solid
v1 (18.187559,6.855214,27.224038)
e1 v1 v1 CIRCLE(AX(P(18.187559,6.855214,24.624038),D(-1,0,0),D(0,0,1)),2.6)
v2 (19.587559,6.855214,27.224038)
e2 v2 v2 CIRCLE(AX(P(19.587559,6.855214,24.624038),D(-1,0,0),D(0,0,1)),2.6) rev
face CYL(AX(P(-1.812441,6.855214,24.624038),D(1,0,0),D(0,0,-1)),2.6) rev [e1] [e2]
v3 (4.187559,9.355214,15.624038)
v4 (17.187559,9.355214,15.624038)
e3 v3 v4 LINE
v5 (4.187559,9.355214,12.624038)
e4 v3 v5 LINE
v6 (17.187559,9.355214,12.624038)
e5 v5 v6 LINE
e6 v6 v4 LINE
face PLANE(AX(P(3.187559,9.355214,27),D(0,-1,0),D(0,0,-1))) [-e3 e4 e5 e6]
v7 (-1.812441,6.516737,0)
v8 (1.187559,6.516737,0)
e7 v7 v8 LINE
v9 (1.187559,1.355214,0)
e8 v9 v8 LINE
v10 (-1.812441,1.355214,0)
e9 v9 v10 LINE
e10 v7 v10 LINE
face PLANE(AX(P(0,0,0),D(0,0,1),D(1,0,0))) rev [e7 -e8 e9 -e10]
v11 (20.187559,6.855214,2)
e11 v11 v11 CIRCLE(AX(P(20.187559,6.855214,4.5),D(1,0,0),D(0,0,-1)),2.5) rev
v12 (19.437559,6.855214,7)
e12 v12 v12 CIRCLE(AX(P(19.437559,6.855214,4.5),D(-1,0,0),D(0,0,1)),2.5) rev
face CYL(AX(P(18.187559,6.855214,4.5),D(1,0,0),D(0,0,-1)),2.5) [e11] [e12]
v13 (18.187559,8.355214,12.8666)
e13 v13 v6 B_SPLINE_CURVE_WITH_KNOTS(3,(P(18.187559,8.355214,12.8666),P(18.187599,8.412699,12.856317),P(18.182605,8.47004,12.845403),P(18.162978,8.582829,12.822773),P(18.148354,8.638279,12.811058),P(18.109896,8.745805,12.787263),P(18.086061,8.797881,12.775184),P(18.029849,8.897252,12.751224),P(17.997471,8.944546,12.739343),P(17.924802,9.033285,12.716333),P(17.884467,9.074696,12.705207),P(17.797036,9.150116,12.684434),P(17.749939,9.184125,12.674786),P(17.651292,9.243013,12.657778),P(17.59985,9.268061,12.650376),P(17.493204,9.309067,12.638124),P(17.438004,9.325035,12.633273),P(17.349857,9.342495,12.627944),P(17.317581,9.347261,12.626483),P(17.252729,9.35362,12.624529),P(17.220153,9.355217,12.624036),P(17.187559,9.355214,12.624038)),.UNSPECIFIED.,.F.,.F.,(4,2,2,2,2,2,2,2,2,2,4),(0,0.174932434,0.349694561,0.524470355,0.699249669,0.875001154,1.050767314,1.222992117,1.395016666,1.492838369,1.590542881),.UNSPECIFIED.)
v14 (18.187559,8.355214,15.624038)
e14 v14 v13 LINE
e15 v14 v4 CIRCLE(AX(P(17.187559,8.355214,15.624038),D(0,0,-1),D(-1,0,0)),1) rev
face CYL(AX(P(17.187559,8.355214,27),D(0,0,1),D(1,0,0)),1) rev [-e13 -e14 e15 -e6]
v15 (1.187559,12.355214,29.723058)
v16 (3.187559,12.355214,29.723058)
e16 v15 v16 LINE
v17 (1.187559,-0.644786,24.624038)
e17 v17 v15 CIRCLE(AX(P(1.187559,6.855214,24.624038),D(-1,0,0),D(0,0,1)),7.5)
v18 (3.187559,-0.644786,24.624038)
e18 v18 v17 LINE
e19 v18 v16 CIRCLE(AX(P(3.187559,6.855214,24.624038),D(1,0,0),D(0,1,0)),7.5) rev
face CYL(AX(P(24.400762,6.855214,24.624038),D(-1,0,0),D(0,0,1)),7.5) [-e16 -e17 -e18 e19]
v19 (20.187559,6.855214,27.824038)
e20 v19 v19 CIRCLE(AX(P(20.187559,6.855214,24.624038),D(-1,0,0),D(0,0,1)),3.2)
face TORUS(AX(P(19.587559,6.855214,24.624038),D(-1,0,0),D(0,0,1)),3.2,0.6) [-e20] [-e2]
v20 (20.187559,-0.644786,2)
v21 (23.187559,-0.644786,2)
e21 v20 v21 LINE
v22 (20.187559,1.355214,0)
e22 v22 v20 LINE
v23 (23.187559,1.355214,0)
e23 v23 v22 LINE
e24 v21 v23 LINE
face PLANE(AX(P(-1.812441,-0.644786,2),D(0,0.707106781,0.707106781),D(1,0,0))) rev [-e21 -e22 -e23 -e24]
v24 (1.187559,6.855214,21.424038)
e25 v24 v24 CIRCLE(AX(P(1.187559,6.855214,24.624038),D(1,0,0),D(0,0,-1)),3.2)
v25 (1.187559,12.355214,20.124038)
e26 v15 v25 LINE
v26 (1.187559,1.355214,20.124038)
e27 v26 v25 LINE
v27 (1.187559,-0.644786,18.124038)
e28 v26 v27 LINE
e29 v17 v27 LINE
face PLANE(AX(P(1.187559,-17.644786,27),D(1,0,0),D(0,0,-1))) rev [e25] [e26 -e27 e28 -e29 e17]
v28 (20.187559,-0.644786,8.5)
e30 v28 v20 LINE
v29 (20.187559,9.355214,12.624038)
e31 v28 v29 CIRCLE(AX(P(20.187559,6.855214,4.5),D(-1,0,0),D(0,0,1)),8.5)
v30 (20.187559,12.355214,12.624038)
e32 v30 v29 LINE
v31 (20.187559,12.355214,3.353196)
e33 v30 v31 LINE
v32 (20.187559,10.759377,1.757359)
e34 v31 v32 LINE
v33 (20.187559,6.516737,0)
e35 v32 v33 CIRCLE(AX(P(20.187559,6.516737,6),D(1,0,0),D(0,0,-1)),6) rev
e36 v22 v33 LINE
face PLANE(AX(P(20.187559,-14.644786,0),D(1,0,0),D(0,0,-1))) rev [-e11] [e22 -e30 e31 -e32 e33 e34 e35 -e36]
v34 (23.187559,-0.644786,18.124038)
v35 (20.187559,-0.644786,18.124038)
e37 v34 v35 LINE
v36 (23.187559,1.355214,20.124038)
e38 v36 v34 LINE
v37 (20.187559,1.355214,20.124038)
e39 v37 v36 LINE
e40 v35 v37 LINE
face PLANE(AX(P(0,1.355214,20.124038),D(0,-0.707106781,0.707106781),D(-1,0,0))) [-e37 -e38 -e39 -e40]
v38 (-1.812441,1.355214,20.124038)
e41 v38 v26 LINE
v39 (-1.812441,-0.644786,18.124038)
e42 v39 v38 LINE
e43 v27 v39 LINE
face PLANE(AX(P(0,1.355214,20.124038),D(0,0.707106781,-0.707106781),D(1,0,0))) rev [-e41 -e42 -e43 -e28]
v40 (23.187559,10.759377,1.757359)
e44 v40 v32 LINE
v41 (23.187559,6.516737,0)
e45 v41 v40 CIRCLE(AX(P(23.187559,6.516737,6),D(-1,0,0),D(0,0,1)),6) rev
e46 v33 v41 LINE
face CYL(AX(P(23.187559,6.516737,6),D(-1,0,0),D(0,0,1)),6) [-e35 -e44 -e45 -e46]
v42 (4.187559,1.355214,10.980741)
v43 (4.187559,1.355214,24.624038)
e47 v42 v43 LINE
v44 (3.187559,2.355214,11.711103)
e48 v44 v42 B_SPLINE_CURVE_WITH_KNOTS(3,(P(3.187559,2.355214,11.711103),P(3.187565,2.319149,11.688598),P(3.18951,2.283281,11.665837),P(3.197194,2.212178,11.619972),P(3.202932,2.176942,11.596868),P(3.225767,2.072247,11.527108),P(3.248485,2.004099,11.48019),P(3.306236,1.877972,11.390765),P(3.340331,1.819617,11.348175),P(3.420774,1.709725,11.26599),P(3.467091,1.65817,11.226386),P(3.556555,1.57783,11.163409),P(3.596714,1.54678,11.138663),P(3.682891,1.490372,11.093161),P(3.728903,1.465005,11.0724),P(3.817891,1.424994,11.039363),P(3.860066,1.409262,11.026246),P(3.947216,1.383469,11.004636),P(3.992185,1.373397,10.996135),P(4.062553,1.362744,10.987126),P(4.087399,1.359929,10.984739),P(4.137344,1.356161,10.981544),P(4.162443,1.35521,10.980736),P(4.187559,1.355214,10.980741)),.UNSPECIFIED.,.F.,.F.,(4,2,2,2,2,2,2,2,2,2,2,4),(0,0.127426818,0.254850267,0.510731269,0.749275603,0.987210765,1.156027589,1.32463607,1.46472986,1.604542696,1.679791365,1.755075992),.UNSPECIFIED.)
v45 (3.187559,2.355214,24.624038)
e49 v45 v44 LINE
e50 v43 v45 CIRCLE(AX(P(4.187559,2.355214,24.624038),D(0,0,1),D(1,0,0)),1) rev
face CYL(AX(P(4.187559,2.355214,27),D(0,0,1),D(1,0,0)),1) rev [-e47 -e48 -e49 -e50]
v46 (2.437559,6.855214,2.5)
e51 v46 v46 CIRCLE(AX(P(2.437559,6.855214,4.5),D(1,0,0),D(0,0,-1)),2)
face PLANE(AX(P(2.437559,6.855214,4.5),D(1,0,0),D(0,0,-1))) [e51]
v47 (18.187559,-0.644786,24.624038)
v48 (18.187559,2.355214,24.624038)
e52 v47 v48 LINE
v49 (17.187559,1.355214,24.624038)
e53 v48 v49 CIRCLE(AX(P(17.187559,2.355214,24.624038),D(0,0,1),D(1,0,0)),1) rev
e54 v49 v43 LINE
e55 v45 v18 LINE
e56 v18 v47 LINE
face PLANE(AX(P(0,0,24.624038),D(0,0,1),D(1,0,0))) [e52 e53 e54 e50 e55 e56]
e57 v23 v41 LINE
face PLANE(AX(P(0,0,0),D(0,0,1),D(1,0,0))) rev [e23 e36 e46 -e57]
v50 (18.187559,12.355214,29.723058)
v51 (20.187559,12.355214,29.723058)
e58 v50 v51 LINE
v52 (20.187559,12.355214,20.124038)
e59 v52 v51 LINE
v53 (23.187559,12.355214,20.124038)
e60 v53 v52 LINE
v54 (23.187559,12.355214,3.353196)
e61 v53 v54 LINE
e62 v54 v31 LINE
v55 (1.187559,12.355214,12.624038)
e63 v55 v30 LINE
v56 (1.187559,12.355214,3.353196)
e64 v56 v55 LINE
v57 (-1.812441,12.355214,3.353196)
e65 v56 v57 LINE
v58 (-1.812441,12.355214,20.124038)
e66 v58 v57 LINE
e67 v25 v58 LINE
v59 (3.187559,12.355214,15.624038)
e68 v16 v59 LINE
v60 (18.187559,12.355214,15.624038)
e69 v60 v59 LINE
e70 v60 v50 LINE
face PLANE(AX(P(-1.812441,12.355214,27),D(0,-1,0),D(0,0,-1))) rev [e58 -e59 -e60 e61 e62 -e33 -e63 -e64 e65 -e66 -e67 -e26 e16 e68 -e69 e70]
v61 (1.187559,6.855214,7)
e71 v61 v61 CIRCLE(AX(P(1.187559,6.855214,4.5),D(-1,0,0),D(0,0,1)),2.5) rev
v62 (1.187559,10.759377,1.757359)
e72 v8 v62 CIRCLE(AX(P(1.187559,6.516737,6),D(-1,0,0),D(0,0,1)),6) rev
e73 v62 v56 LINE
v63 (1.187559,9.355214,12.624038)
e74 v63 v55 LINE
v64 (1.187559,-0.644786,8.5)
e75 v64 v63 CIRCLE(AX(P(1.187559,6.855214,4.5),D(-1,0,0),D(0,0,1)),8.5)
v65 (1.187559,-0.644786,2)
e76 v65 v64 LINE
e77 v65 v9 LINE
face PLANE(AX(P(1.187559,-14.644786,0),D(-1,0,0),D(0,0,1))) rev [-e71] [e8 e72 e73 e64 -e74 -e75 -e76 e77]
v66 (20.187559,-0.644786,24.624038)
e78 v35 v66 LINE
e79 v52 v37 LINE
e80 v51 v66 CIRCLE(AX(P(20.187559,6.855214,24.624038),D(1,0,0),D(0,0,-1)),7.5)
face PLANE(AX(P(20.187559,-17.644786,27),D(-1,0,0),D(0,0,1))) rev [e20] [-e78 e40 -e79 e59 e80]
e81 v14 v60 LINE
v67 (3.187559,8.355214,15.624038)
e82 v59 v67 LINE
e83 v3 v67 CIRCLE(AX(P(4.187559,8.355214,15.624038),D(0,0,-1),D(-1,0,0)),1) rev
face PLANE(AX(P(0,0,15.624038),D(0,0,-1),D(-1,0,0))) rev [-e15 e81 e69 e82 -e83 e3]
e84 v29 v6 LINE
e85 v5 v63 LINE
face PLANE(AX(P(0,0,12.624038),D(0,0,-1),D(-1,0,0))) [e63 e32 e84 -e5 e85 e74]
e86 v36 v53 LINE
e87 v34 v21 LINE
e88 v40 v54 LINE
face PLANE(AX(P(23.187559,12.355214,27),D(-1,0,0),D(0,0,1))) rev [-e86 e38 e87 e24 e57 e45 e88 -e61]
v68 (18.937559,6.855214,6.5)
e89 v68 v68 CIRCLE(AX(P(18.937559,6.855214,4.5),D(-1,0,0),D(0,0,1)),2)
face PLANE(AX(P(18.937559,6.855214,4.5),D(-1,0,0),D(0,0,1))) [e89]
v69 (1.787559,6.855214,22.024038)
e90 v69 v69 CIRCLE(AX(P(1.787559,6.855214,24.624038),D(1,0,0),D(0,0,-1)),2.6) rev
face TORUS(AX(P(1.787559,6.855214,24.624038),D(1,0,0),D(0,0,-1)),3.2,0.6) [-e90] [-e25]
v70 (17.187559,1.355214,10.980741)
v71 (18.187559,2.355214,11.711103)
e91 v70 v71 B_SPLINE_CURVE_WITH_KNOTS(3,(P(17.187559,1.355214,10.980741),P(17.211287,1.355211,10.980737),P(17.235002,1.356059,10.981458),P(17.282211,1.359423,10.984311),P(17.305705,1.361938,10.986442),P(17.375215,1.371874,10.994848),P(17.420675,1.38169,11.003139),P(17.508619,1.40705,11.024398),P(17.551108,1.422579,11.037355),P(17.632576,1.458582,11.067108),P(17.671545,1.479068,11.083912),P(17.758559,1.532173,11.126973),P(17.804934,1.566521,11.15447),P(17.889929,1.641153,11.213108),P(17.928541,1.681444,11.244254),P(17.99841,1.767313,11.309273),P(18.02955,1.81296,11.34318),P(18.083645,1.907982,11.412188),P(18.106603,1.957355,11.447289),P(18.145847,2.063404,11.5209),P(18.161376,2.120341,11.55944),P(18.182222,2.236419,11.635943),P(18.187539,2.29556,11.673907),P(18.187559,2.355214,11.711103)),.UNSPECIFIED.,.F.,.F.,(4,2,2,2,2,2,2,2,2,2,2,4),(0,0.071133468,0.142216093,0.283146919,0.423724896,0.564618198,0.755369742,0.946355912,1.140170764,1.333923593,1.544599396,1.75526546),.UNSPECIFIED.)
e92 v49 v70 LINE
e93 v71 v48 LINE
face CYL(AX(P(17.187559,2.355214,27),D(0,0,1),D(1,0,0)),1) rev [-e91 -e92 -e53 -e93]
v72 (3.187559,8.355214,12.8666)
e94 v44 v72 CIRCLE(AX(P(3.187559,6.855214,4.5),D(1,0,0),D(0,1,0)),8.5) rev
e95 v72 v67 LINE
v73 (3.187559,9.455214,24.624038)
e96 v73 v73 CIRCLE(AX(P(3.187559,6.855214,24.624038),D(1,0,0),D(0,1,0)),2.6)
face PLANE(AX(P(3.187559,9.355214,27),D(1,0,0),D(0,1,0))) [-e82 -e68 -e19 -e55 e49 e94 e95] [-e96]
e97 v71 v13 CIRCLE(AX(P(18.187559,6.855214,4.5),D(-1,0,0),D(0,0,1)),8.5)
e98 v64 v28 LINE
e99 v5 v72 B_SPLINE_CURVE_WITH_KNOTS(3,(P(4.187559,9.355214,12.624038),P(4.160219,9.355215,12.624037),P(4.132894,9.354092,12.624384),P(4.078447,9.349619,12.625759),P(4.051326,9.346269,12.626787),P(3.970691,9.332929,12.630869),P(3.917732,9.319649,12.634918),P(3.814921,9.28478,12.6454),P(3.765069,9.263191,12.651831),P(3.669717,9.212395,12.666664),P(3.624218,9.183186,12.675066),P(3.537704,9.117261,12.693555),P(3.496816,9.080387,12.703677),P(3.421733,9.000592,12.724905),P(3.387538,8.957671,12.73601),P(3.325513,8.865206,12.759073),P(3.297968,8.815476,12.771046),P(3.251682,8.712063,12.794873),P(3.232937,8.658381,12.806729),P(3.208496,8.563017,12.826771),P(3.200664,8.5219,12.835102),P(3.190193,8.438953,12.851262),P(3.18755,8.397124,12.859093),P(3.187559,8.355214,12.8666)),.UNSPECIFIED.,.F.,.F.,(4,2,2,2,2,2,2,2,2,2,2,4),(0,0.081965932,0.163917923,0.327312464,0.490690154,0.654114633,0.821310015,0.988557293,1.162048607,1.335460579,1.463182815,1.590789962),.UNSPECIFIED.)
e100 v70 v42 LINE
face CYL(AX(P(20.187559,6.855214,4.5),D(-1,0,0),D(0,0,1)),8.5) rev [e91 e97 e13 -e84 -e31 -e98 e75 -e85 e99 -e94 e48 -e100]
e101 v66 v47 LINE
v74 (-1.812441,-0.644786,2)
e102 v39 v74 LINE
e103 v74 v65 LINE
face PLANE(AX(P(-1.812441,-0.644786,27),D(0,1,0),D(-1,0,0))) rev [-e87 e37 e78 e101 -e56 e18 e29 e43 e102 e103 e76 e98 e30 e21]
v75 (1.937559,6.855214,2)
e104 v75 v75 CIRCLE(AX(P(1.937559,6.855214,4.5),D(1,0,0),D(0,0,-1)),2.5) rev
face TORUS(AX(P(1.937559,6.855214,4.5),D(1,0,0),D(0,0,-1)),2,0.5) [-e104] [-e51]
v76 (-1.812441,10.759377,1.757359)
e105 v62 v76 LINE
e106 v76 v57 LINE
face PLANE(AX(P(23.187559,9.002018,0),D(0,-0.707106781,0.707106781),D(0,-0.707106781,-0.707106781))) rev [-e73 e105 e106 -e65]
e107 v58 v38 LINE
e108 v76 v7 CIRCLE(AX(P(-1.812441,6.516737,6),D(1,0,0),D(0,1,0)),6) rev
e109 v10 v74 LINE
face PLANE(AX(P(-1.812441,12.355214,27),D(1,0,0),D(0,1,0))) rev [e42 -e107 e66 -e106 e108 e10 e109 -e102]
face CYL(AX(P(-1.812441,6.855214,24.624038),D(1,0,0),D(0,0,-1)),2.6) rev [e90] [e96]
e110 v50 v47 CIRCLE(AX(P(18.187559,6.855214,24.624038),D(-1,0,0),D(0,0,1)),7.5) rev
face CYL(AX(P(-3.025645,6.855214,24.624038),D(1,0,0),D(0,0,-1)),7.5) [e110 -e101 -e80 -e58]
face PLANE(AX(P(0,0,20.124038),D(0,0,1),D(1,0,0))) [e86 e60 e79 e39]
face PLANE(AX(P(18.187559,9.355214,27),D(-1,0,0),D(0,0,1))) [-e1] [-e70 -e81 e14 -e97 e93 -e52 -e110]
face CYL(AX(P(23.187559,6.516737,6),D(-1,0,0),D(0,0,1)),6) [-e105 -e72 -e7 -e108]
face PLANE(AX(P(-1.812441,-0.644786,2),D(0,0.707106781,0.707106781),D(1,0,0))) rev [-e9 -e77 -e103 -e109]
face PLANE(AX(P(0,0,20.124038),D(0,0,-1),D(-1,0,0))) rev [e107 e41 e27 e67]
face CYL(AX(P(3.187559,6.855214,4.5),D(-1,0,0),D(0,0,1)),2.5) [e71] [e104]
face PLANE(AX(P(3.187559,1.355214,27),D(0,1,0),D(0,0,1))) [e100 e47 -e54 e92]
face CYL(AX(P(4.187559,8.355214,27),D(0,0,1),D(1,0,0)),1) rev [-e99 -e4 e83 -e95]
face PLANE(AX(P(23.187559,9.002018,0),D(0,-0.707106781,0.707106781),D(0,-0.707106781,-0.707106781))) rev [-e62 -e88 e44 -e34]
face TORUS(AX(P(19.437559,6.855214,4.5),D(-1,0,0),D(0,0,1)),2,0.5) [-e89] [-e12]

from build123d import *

# Parameters (mm, degrees)
EXTRUDE_1_DEPTH           = 27
CUT_EXTRUDE_1_DEPTH       = 27
SKETCH_3_R                = 2.5000000000000013
EXTRUDE_2_DEPTH           = 2
CUT_EXTRUDE_START         = -2
SKETCH_4_R                = 8.5
SKETCH_4_R_2              = 2.5000000000000018
CUT_EXTRUDE_2_DEPTH       = 2
SKETCH_5_R                = 8.5
CUT_EXTRUDE_3_DEPTH       = 17
SKETCH_9_W                = 19
SKETCH_9_H                = 0.7371254741666728
CUT_EXTRUDE_7_DEPTH       = 4
CUT_EXTRUDE_8_DEPTH       = 0.906172
EXTRUDE_START             = 2
SKETCH_13_R               = 2.5000000000000004
EXTRUDE_4_DEPTH           = 2
SKETCH_14_W               = 3
SKETCH_14_H               = 7.375961595364039
SKETCH_14_W_2             = 2.9999999999999964
CUT_EXTRUDE_10_DEPTH      = 30
CUT_EXTRUDE_11_DEPTH      = 37.95471984311929
CUT_EXTRUDE_11_DEPTH_BACK = 37.95471984311929
FILLET_3_R                = 6
SKETCH_19_W               = 2.3759615953640427
SKETCH_19_H               = 13
CUT_EXTRUDE_13_DEPTH      = 37.95471984311929
SKETCH_18_R               = 7.499999999999999
EXTRUDE_5_DEPTH           = 2
EXTRUDE_START_2           = -2
SKETCH_20_R               = 7.499999999999999
EXTRUDE_6_DEPTH           = 2
SKETCH_21_W               = 27.916060476025446
SKETCH_21_H               = 6.853449812850004
CUT_EXTRUDE_14_DEPTH      = 44.16278511667507
CUT_EXTRUDE_15_DEPTH      = 41.84856377041868
CUT_EXTRUDE_15_DEPTH_BACK = 41.84856377041868
SKETCH_22_R               = 2.5999999999999996
FILLET_4_R                = 0.6
FILLET_5_R                = 0.6
FILLET_6_R                = 1
FILLET_7_R                = 0.5
SKETCH_23_R               = 2.5000000000000004
CUT_EXTRUDE_16_DEPTH      = 0.75
CUT_EXTRUDE_START_2       = -0.75
SKETCH_25_R               = 2.5000000000000013
CUT_EXTRUDE_17_DEPTH      = 0.75
FILLET_8_R                = 0.5
SKETCH_27_W               = 15
SKETCH_27_H               = 4.175939890720404
CUT_EXTRUDE_18_DEPTH      = 4
EXTRUDE_8_DEPTH           = 5
FILLET_9_R                = 1
SKETCH_29_W               = 2.9999999999999964
SKETCH_29_H               = 12.999999999999996
SKETCH_29_W_2             = 3
EXTRUDE_9_DEPTH           = 0.5
CHAMFER_1_SIZE            = 2


with BuildPart() as part:
    # 草圖1 → 填料-伸長1 (new body)
    with BuildSketch(Plane.XY):
        Polygon((-1.8124414345344562, 12.355214230576285), (23.187558565465547, 12.355214230576285), (23.187558565465547, -0.6447857694237141), (-1.8124414345344548, -0.6447857694237142), align=None)
        Polygon((3.1875585654655443, 9.355214230576284), (18.187558565465544, 9.355214230576284), (18.187558565465544, 1.355214230576286), (3.187558565465545, 1.355214230576286), align=None, mode=Mode.SUBTRACT)
    extrude(amount=EXTRUDE_1_DEPTH)

    # 草圖2 → 除料-伸長1 (cut)
    with BuildSketch(Plane(origin=(0, 12.355214230576285, 0), x_dir=(1, 0, 0), z_dir=(0, 1, 0))):
        Polygon((1.1875585654655443, 0), (20.187558565465547, 0), (20.187558565465547, -8), (1.1875585654655452, -8), align=None)
    extrude(amount=-CUT_EXTRUDE_1_DEPTH, mode=Mode.SUBTRACT)

    # 草圖3 → 填料-伸長2 (add)
    with BuildSketch(Plane.ZY.offset(-20.187558565465547)):
        with Locations(Location((4.5, 6.855214230576285, 0), (0, 0, 180))):
            Circle(SKETCH_3_R)
    extrude(amount=EXTRUDE_2_DEPTH)

    # 草圖4 → 除料-伸長2 (cut)
    with BuildSketch(Plane.ZY.offset(-18.187558565465547).offset(CUT_EXTRUDE_START)):
        with Locations((4.500000000000004, 6.855214230576285)):
            Circle(SKETCH_4_R)
        with Locations(Location((4.500000000000004, 6.855214230576285, 0), (0, 0, 180))):
            Circle(SKETCH_4_R_2, mode=Mode.SUBTRACT)
    extrude(amount=CUT_EXTRUDE_2_DEPTH, mode=Mode.SUBTRACT)

    # 草圖5 → 除料-伸長3 (cut)
    with BuildSketch(Plane.ZY.offset(-18.187558565465547)):
        with Locations((4.500000000000004, 6.855214230576285)):
            Circle(SKETCH_5_R)
    extrude(amount=CUT_EXTRUDE_3_DEPTH, mode=Mode.SUBTRACT)

    # 草圖9 → 除料-伸長7 (cut)
    with BuildSketch(Plane(origin=(0, 12.355214230576285, 0), x_dir=(1, 0, 0), z_dir=(0, 1, 0))):
        with Locations((10.687558565465551, -11.349303435491194)):
            Rectangle(SKETCH_9_W, SKETCH_9_H)
    extrude(amount=-CUT_EXTRUDE_7_DEPTH, mode=Mode.SUBTRACT)

    # 草圖10 → 除料-伸長8 (cut)
    with BuildSketch(Plane(origin=(0, 0, 11.717866172574531), x_dir=(-1, 0, 0), z_dir=(0, 0, -1))):
        Polygon((-20.18755856546555, 12.355214230576285), (-1.1875585654655494, 12.355214230576285), (-1.1875585654655487, 9.355214230576284), (-20.18755856546555, 9.355214230576284), align=None)
    extrude(amount=-CUT_EXTRUDE_8_DEPTH, mode=Mode.SUBTRACT)

    # 草圖13 → 填料-伸長4 (add)
    with BuildSketch(Plane(origin=(1.1875585654655443, 0, -1.3e-16), x_dir=(-1.1e-16, 0, -1), z_dir=(1, 0, -1.1e-16)).offset(EXTRUDE_START)):
        with Locations((-4.5, 6.855214230576285)):
            Circle(SKETCH_13_R)
    extrude(amount=-EXTRUDE_4_DEPTH)

    # 草圖14 → 除料-伸長10 (cut)
    with BuildSketch(Plane(origin=(0, 12.355214230576285, 0), x_dir=(1, 0, 0), z_dir=(0, 1, 0))):
        with Locations((-0.31244143453445605, -23.312019202317984)):
            Rectangle(SKETCH_14_W, SKETCH_14_H)
        with Locations((21.687558565465544, -23.312019202317984)):
            Rectangle(SKETCH_14_W_2, SKETCH_14_H)
        Polygon((3.1875585654655425, -27), (18.187558565465547, -27), (18.187558565465547, -19.624038404635964), (3.1875585654655443, -19.624038404635964), align=None)
    extrude(amount=-CUT_EXTRUDE_10_DEPTH, mode=Mode.SUBTRACT)

    # 草圖15 → 除料-伸長11 (cut, two sides: drawn at the far end of the back side and taken through both)
    with BuildSketch(Plane.ZY.offset(-20.187558565465547).offset(-CUT_EXTRUDE_11_DEPTH_BACK)):
        Polygon((0, 9.00201797372982), (3.3531962568464273, 12.355214230576285), (0, 12.355214230576285), align=None)
    extrude(amount=CUT_EXTRUDE_11_DEPTH + CUT_EXTRUDE_11_DEPTH_BACK, mode=Mode.SUBTRACT)

    # 圓角3
    fillet_3_edges = [part.edges().sort_by_distance(p)[0] for p in [
        (-0.31244143453445616, 9.00201797372982, 0),
        (21.687558565465547, 9.00201797372982, 0),
    ]]
    fillet(fillet_3_edges, radius=FILLET_3_R)

    # 草圖19 → 除料-伸長13 (cut, through all)
    with BuildSketch(Plane.ZY.offset(-1.187558565465544)):
        with Locations((25.812019202317984, 5.855214230576285)):
            Rectangle(SKETCH_19_W, SKETCH_19_H)
    extrude(amount=-CUT_EXTRUDE_13_DEPTH, mode=Mode.SUBTRACT)

    # 草圖18 → 填料-伸長5 (add)
    with BuildSketch(Plane(origin=(20.187558565465547, 0, 0), x_dir=(0, 0, -1), z_dir=(1, 0, 0))):
        with Locations((-24.624038404635964, 6.855214230576285)):
            Circle(SKETCH_18_R)
    extrude(amount=-EXTRUDE_5_DEPTH)

    # 草圖20 → 填料-伸長6 (add)
    with BuildSketch(Plane.ZY.offset(-1.187558565465544).offset(EXTRUDE_START_2)):
        with Locations((24.624038404635964, 6.855214230576285)):
            Circle(SKETCH_20_R)
    extrude(amount=EXTRUDE_6_DEPTH)

    # 草圖21 → 除料-伸長14 (cut, through all)
    with BuildSketch(Plane(origin=(23.187558565465547, 0, 0), x_dir=(0, 0, -1), z_dir=(1, 0, 0))):
        with Locations((-28.1917606773101, 15.781939137001288)):
            Rectangle(SKETCH_21_W, SKETCH_21_H)
    extrude(amount=-CUT_EXTRUDE_14_DEPTH, mode=Mode.SUBTRACT)

    # 草圖22 → 除料-伸長15 (cut, two sides: drawn at the far end of the back side and taken through both)
    with BuildSketch(Plane(origin=(20.187558565465547, 0, 0), x_dir=(0, 0, -1), z_dir=(1, 0, 0)).offset(-CUT_EXTRUDE_15_DEPTH_BACK)):
        with Locations((-24.624038404635964, 6.8552142305762835)):
            Circle(SKETCH_22_R)
    extrude(amount=CUT_EXTRUDE_15_DEPTH + CUT_EXTRUDE_15_DEPTH_BACK, mode=Mode.SUBTRACT)

    # 圓角4
    fillet_4_edges = [part.edges().sort_by_distance(p)[0] for p in [
        (20.187558565465547, 6.855214230576285, 27.224038404635962),
    ]]
    fillet(fillet_4_edges, radius=FILLET_4_R)

    # 圓角5
    fillet_5_edges = [part.edges().sort_by_distance(p)[0] for p in [
        (1.1875585654655438, 6.855214230576285, 27.224038404635962),
    ]]
    fillet(fillet_5_edges, radius=FILLET_5_R)

    # 圓角6
    # the kernel refuses this fillet: 1 mm, written as the material it adds along each edge
    with BuildSketch(Plane(origin=(18.187558565465544, 9.355214230576284, 19.624038404635964), x_dir=(3.55e-15, -1, 1.066e-14), z_dir=(5.1e-16, -1.066e-14, -1))) as fillet_6_piece_1_section:
        with BuildLine():
            CenterArc((FILLET_6_R, FILLET_6_R), FILLET_6_R, 180, 90.00000000000023)
            Line((-3.55e-15, FILLET_6_R), (0, 0))
            Line((0, 0), (FILLET_6_R, 0))
        make_face()
    fillet_6_piece_1 = extrude(amount=9.499999999999957, mode=Mode.PRIVATE)
    fillet_6_piece_1 = split(fillet_6_piece_1, bisect_by=Plane(origin=(17.960107802534193, 9.130564344096692, 12.624038172574531), z_dir=(0, 0, 1)), keep=Keep.TOP, mode=Mode.PRIVATE)
    fillet_6_piece_1 = fillet_6_piece_1 - Plane(origin=(17.96010780253419, 6.855214230576285, 4.5), x_dir=(2.4e-16, 0, 1), z_dir=(1, 0, -2.4e-16)) * Cylinder(8.5, 23, mode=Mode.PRIVATE)
    add(fillet_6_piece_1)
    with BuildSketch(Plane(origin=(3.187558565465544, 9.355214230576284, 10.124038404635964), x_dir=(0, -1, 0), z_dir=(0, 0, 1))) as fillet_6_piece_2_section:
        with BuildLine():
            CenterArc((FILLET_6_R, FILLET_6_R), FILLET_6_R, 180, 90)
            Line((0, FILLET_6_R), (0, 0))
            Line((0, 0), (FILLET_6_R, 0))
        make_face()
    fillet_6_piece_2 = extrude(amount=9.5, mode=Mode.PRIVATE)
    fillet_6_piece_2 = split(fillet_6_piece_2, bisect_by=Plane(origin=(3.4150094343401456, 9.130564406809754, 12.624038172574531), z_dir=(0, 0, 1)), keep=Keep.TOP, mode=Mode.PRIVATE)
    fillet_6_piece_2 = fillet_6_piece_2 - Plane(origin=(3.415009434340142, 6.855214230576285, 4.5000000000000036), x_dir=(2.4e-16, 0, 1), z_dir=(1, 0, -2.4e-16)) * Cylinder(8.5, 23, mode=Mode.PRIVATE)
    add(fillet_6_piece_2)

    # 圓角7
    fillet_7_edges = [part.edges().sort_by_distance(p)[0] for p in [
        (10.687558565465999, 9.355214230576284, 19.624038404635964),
        (3.4804517842794525, 9.062321011762547, 19.624038404636),
        (17.894665346652545, 9.062321011762547, 19.624038404636),
    ]]
    fillet(fillet_7_edges, radius=FILLET_7_R)

    # 草圖23 → 除料-伸長16 (cut)
    with BuildSketch(Plane(origin=(3.1875585654655443, 0, -3.5e-16), x_dir=(-1.1e-16, 0, -1), z_dir=(1, 0, -1.1e-16))):
        with Locations(Location((-4.5, 6.855214230576285, 0), (0, 0, 180))):
            Circle(SKETCH_23_R)
    extrude(amount=-CUT_EXTRUDE_16_DEPTH, mode=Mode.SUBTRACT)

    # 草圖25 → 除料-伸長17 (cut)
    with BuildSketch(Plane.ZY.offset(-18.187558565465547).offset(CUT_EXTRUDE_START_2)):
        with Locations(Location((4.500000000000004, 6.855214230576285, 0), (0, 0, 180))):
            Circle(SKETCH_25_R)
    extrude(amount=CUT_EXTRUDE_17_DEPTH, mode=Mode.SUBTRACT)

    # 圓角8
    fillet_8_edges = [part.edges().sort_by_distance(p)[0] for p in [
        (2.437558565465545, 6.855214230576286, 7),
        (18.937558565465547, 6.855214230576284, 7.000000000000001),
    ]]
    fillet(fillet_8_edges, radius=FILLET_8_R)

    # 草圖27 → 除料-伸長18 (cut)
    with BuildSketch(Plane.XY.offset(19.624038404635964)):
        with Locations((10.687558565465544, 10.267244285216083)):
            Rectangle(SKETCH_27_W, SKETCH_27_H)
    extrude(amount=-CUT_EXTRUDE_18_DEPTH, mode=Mode.SUBTRACT)

    # 草圖28 → 填料-伸長8 (add)
    with BuildSketch(Plane.XY.offset(19.624038404635964)):
        Polygon((18.187558565465547, -0.6447857694237141), (3.1875585654655443, -0.6447857694237141), (3.1875585654655434, 1.355214230576286), (18.187558565465547, 1.3552142305762875), align=None)
    extrude(amount=EXTRUDE_8_DEPTH)

    # 圓角9
    fillet_9_edges = [part.edges().sort_by_distance(p)[0] for p in [
        (18.187558565465544, 1.3552142305762809, 17.8023895515219),
        (3.1875585654655443, 1.355214230576286, 17.802389551521912),
    ]]
    fillet(fillet_9_edges, radius=FILLET_9_R)

    # 草圖29 → 填料-伸長9 (add)
    with BuildSketch(Plane.XY.offset(19.624038404635964)):
        with Locations((21.687558565465544, 5.8552142305762835)):
            Rectangle(SKETCH_29_W, SKETCH_29_H)
        with Locations((-0.31244143453445605, 5.8552142305762835)):
            Rectangle(SKETCH_29_W_2, SKETCH_29_H)
    extrude(amount=EXTRUDE_9_DEPTH)

    # 導角1
    chamfer_1_edges = [part.edges().sort_by_distance(p)[0] for p in [
        (21.687558565465547, -0.6447857694237141, 0),
        (21.687558565465547, -0.6447857694237141, 20.124038404635964),
        (-0.31244143453445616, -0.6447857694237141, 20.124038404635964),
        (-0.31244143453445616, -0.6447857694237142, 0),
    ]]
    chamfer(chamfer_1_edges, length=CHAMFER_1_SIZE)


solid = part.part
